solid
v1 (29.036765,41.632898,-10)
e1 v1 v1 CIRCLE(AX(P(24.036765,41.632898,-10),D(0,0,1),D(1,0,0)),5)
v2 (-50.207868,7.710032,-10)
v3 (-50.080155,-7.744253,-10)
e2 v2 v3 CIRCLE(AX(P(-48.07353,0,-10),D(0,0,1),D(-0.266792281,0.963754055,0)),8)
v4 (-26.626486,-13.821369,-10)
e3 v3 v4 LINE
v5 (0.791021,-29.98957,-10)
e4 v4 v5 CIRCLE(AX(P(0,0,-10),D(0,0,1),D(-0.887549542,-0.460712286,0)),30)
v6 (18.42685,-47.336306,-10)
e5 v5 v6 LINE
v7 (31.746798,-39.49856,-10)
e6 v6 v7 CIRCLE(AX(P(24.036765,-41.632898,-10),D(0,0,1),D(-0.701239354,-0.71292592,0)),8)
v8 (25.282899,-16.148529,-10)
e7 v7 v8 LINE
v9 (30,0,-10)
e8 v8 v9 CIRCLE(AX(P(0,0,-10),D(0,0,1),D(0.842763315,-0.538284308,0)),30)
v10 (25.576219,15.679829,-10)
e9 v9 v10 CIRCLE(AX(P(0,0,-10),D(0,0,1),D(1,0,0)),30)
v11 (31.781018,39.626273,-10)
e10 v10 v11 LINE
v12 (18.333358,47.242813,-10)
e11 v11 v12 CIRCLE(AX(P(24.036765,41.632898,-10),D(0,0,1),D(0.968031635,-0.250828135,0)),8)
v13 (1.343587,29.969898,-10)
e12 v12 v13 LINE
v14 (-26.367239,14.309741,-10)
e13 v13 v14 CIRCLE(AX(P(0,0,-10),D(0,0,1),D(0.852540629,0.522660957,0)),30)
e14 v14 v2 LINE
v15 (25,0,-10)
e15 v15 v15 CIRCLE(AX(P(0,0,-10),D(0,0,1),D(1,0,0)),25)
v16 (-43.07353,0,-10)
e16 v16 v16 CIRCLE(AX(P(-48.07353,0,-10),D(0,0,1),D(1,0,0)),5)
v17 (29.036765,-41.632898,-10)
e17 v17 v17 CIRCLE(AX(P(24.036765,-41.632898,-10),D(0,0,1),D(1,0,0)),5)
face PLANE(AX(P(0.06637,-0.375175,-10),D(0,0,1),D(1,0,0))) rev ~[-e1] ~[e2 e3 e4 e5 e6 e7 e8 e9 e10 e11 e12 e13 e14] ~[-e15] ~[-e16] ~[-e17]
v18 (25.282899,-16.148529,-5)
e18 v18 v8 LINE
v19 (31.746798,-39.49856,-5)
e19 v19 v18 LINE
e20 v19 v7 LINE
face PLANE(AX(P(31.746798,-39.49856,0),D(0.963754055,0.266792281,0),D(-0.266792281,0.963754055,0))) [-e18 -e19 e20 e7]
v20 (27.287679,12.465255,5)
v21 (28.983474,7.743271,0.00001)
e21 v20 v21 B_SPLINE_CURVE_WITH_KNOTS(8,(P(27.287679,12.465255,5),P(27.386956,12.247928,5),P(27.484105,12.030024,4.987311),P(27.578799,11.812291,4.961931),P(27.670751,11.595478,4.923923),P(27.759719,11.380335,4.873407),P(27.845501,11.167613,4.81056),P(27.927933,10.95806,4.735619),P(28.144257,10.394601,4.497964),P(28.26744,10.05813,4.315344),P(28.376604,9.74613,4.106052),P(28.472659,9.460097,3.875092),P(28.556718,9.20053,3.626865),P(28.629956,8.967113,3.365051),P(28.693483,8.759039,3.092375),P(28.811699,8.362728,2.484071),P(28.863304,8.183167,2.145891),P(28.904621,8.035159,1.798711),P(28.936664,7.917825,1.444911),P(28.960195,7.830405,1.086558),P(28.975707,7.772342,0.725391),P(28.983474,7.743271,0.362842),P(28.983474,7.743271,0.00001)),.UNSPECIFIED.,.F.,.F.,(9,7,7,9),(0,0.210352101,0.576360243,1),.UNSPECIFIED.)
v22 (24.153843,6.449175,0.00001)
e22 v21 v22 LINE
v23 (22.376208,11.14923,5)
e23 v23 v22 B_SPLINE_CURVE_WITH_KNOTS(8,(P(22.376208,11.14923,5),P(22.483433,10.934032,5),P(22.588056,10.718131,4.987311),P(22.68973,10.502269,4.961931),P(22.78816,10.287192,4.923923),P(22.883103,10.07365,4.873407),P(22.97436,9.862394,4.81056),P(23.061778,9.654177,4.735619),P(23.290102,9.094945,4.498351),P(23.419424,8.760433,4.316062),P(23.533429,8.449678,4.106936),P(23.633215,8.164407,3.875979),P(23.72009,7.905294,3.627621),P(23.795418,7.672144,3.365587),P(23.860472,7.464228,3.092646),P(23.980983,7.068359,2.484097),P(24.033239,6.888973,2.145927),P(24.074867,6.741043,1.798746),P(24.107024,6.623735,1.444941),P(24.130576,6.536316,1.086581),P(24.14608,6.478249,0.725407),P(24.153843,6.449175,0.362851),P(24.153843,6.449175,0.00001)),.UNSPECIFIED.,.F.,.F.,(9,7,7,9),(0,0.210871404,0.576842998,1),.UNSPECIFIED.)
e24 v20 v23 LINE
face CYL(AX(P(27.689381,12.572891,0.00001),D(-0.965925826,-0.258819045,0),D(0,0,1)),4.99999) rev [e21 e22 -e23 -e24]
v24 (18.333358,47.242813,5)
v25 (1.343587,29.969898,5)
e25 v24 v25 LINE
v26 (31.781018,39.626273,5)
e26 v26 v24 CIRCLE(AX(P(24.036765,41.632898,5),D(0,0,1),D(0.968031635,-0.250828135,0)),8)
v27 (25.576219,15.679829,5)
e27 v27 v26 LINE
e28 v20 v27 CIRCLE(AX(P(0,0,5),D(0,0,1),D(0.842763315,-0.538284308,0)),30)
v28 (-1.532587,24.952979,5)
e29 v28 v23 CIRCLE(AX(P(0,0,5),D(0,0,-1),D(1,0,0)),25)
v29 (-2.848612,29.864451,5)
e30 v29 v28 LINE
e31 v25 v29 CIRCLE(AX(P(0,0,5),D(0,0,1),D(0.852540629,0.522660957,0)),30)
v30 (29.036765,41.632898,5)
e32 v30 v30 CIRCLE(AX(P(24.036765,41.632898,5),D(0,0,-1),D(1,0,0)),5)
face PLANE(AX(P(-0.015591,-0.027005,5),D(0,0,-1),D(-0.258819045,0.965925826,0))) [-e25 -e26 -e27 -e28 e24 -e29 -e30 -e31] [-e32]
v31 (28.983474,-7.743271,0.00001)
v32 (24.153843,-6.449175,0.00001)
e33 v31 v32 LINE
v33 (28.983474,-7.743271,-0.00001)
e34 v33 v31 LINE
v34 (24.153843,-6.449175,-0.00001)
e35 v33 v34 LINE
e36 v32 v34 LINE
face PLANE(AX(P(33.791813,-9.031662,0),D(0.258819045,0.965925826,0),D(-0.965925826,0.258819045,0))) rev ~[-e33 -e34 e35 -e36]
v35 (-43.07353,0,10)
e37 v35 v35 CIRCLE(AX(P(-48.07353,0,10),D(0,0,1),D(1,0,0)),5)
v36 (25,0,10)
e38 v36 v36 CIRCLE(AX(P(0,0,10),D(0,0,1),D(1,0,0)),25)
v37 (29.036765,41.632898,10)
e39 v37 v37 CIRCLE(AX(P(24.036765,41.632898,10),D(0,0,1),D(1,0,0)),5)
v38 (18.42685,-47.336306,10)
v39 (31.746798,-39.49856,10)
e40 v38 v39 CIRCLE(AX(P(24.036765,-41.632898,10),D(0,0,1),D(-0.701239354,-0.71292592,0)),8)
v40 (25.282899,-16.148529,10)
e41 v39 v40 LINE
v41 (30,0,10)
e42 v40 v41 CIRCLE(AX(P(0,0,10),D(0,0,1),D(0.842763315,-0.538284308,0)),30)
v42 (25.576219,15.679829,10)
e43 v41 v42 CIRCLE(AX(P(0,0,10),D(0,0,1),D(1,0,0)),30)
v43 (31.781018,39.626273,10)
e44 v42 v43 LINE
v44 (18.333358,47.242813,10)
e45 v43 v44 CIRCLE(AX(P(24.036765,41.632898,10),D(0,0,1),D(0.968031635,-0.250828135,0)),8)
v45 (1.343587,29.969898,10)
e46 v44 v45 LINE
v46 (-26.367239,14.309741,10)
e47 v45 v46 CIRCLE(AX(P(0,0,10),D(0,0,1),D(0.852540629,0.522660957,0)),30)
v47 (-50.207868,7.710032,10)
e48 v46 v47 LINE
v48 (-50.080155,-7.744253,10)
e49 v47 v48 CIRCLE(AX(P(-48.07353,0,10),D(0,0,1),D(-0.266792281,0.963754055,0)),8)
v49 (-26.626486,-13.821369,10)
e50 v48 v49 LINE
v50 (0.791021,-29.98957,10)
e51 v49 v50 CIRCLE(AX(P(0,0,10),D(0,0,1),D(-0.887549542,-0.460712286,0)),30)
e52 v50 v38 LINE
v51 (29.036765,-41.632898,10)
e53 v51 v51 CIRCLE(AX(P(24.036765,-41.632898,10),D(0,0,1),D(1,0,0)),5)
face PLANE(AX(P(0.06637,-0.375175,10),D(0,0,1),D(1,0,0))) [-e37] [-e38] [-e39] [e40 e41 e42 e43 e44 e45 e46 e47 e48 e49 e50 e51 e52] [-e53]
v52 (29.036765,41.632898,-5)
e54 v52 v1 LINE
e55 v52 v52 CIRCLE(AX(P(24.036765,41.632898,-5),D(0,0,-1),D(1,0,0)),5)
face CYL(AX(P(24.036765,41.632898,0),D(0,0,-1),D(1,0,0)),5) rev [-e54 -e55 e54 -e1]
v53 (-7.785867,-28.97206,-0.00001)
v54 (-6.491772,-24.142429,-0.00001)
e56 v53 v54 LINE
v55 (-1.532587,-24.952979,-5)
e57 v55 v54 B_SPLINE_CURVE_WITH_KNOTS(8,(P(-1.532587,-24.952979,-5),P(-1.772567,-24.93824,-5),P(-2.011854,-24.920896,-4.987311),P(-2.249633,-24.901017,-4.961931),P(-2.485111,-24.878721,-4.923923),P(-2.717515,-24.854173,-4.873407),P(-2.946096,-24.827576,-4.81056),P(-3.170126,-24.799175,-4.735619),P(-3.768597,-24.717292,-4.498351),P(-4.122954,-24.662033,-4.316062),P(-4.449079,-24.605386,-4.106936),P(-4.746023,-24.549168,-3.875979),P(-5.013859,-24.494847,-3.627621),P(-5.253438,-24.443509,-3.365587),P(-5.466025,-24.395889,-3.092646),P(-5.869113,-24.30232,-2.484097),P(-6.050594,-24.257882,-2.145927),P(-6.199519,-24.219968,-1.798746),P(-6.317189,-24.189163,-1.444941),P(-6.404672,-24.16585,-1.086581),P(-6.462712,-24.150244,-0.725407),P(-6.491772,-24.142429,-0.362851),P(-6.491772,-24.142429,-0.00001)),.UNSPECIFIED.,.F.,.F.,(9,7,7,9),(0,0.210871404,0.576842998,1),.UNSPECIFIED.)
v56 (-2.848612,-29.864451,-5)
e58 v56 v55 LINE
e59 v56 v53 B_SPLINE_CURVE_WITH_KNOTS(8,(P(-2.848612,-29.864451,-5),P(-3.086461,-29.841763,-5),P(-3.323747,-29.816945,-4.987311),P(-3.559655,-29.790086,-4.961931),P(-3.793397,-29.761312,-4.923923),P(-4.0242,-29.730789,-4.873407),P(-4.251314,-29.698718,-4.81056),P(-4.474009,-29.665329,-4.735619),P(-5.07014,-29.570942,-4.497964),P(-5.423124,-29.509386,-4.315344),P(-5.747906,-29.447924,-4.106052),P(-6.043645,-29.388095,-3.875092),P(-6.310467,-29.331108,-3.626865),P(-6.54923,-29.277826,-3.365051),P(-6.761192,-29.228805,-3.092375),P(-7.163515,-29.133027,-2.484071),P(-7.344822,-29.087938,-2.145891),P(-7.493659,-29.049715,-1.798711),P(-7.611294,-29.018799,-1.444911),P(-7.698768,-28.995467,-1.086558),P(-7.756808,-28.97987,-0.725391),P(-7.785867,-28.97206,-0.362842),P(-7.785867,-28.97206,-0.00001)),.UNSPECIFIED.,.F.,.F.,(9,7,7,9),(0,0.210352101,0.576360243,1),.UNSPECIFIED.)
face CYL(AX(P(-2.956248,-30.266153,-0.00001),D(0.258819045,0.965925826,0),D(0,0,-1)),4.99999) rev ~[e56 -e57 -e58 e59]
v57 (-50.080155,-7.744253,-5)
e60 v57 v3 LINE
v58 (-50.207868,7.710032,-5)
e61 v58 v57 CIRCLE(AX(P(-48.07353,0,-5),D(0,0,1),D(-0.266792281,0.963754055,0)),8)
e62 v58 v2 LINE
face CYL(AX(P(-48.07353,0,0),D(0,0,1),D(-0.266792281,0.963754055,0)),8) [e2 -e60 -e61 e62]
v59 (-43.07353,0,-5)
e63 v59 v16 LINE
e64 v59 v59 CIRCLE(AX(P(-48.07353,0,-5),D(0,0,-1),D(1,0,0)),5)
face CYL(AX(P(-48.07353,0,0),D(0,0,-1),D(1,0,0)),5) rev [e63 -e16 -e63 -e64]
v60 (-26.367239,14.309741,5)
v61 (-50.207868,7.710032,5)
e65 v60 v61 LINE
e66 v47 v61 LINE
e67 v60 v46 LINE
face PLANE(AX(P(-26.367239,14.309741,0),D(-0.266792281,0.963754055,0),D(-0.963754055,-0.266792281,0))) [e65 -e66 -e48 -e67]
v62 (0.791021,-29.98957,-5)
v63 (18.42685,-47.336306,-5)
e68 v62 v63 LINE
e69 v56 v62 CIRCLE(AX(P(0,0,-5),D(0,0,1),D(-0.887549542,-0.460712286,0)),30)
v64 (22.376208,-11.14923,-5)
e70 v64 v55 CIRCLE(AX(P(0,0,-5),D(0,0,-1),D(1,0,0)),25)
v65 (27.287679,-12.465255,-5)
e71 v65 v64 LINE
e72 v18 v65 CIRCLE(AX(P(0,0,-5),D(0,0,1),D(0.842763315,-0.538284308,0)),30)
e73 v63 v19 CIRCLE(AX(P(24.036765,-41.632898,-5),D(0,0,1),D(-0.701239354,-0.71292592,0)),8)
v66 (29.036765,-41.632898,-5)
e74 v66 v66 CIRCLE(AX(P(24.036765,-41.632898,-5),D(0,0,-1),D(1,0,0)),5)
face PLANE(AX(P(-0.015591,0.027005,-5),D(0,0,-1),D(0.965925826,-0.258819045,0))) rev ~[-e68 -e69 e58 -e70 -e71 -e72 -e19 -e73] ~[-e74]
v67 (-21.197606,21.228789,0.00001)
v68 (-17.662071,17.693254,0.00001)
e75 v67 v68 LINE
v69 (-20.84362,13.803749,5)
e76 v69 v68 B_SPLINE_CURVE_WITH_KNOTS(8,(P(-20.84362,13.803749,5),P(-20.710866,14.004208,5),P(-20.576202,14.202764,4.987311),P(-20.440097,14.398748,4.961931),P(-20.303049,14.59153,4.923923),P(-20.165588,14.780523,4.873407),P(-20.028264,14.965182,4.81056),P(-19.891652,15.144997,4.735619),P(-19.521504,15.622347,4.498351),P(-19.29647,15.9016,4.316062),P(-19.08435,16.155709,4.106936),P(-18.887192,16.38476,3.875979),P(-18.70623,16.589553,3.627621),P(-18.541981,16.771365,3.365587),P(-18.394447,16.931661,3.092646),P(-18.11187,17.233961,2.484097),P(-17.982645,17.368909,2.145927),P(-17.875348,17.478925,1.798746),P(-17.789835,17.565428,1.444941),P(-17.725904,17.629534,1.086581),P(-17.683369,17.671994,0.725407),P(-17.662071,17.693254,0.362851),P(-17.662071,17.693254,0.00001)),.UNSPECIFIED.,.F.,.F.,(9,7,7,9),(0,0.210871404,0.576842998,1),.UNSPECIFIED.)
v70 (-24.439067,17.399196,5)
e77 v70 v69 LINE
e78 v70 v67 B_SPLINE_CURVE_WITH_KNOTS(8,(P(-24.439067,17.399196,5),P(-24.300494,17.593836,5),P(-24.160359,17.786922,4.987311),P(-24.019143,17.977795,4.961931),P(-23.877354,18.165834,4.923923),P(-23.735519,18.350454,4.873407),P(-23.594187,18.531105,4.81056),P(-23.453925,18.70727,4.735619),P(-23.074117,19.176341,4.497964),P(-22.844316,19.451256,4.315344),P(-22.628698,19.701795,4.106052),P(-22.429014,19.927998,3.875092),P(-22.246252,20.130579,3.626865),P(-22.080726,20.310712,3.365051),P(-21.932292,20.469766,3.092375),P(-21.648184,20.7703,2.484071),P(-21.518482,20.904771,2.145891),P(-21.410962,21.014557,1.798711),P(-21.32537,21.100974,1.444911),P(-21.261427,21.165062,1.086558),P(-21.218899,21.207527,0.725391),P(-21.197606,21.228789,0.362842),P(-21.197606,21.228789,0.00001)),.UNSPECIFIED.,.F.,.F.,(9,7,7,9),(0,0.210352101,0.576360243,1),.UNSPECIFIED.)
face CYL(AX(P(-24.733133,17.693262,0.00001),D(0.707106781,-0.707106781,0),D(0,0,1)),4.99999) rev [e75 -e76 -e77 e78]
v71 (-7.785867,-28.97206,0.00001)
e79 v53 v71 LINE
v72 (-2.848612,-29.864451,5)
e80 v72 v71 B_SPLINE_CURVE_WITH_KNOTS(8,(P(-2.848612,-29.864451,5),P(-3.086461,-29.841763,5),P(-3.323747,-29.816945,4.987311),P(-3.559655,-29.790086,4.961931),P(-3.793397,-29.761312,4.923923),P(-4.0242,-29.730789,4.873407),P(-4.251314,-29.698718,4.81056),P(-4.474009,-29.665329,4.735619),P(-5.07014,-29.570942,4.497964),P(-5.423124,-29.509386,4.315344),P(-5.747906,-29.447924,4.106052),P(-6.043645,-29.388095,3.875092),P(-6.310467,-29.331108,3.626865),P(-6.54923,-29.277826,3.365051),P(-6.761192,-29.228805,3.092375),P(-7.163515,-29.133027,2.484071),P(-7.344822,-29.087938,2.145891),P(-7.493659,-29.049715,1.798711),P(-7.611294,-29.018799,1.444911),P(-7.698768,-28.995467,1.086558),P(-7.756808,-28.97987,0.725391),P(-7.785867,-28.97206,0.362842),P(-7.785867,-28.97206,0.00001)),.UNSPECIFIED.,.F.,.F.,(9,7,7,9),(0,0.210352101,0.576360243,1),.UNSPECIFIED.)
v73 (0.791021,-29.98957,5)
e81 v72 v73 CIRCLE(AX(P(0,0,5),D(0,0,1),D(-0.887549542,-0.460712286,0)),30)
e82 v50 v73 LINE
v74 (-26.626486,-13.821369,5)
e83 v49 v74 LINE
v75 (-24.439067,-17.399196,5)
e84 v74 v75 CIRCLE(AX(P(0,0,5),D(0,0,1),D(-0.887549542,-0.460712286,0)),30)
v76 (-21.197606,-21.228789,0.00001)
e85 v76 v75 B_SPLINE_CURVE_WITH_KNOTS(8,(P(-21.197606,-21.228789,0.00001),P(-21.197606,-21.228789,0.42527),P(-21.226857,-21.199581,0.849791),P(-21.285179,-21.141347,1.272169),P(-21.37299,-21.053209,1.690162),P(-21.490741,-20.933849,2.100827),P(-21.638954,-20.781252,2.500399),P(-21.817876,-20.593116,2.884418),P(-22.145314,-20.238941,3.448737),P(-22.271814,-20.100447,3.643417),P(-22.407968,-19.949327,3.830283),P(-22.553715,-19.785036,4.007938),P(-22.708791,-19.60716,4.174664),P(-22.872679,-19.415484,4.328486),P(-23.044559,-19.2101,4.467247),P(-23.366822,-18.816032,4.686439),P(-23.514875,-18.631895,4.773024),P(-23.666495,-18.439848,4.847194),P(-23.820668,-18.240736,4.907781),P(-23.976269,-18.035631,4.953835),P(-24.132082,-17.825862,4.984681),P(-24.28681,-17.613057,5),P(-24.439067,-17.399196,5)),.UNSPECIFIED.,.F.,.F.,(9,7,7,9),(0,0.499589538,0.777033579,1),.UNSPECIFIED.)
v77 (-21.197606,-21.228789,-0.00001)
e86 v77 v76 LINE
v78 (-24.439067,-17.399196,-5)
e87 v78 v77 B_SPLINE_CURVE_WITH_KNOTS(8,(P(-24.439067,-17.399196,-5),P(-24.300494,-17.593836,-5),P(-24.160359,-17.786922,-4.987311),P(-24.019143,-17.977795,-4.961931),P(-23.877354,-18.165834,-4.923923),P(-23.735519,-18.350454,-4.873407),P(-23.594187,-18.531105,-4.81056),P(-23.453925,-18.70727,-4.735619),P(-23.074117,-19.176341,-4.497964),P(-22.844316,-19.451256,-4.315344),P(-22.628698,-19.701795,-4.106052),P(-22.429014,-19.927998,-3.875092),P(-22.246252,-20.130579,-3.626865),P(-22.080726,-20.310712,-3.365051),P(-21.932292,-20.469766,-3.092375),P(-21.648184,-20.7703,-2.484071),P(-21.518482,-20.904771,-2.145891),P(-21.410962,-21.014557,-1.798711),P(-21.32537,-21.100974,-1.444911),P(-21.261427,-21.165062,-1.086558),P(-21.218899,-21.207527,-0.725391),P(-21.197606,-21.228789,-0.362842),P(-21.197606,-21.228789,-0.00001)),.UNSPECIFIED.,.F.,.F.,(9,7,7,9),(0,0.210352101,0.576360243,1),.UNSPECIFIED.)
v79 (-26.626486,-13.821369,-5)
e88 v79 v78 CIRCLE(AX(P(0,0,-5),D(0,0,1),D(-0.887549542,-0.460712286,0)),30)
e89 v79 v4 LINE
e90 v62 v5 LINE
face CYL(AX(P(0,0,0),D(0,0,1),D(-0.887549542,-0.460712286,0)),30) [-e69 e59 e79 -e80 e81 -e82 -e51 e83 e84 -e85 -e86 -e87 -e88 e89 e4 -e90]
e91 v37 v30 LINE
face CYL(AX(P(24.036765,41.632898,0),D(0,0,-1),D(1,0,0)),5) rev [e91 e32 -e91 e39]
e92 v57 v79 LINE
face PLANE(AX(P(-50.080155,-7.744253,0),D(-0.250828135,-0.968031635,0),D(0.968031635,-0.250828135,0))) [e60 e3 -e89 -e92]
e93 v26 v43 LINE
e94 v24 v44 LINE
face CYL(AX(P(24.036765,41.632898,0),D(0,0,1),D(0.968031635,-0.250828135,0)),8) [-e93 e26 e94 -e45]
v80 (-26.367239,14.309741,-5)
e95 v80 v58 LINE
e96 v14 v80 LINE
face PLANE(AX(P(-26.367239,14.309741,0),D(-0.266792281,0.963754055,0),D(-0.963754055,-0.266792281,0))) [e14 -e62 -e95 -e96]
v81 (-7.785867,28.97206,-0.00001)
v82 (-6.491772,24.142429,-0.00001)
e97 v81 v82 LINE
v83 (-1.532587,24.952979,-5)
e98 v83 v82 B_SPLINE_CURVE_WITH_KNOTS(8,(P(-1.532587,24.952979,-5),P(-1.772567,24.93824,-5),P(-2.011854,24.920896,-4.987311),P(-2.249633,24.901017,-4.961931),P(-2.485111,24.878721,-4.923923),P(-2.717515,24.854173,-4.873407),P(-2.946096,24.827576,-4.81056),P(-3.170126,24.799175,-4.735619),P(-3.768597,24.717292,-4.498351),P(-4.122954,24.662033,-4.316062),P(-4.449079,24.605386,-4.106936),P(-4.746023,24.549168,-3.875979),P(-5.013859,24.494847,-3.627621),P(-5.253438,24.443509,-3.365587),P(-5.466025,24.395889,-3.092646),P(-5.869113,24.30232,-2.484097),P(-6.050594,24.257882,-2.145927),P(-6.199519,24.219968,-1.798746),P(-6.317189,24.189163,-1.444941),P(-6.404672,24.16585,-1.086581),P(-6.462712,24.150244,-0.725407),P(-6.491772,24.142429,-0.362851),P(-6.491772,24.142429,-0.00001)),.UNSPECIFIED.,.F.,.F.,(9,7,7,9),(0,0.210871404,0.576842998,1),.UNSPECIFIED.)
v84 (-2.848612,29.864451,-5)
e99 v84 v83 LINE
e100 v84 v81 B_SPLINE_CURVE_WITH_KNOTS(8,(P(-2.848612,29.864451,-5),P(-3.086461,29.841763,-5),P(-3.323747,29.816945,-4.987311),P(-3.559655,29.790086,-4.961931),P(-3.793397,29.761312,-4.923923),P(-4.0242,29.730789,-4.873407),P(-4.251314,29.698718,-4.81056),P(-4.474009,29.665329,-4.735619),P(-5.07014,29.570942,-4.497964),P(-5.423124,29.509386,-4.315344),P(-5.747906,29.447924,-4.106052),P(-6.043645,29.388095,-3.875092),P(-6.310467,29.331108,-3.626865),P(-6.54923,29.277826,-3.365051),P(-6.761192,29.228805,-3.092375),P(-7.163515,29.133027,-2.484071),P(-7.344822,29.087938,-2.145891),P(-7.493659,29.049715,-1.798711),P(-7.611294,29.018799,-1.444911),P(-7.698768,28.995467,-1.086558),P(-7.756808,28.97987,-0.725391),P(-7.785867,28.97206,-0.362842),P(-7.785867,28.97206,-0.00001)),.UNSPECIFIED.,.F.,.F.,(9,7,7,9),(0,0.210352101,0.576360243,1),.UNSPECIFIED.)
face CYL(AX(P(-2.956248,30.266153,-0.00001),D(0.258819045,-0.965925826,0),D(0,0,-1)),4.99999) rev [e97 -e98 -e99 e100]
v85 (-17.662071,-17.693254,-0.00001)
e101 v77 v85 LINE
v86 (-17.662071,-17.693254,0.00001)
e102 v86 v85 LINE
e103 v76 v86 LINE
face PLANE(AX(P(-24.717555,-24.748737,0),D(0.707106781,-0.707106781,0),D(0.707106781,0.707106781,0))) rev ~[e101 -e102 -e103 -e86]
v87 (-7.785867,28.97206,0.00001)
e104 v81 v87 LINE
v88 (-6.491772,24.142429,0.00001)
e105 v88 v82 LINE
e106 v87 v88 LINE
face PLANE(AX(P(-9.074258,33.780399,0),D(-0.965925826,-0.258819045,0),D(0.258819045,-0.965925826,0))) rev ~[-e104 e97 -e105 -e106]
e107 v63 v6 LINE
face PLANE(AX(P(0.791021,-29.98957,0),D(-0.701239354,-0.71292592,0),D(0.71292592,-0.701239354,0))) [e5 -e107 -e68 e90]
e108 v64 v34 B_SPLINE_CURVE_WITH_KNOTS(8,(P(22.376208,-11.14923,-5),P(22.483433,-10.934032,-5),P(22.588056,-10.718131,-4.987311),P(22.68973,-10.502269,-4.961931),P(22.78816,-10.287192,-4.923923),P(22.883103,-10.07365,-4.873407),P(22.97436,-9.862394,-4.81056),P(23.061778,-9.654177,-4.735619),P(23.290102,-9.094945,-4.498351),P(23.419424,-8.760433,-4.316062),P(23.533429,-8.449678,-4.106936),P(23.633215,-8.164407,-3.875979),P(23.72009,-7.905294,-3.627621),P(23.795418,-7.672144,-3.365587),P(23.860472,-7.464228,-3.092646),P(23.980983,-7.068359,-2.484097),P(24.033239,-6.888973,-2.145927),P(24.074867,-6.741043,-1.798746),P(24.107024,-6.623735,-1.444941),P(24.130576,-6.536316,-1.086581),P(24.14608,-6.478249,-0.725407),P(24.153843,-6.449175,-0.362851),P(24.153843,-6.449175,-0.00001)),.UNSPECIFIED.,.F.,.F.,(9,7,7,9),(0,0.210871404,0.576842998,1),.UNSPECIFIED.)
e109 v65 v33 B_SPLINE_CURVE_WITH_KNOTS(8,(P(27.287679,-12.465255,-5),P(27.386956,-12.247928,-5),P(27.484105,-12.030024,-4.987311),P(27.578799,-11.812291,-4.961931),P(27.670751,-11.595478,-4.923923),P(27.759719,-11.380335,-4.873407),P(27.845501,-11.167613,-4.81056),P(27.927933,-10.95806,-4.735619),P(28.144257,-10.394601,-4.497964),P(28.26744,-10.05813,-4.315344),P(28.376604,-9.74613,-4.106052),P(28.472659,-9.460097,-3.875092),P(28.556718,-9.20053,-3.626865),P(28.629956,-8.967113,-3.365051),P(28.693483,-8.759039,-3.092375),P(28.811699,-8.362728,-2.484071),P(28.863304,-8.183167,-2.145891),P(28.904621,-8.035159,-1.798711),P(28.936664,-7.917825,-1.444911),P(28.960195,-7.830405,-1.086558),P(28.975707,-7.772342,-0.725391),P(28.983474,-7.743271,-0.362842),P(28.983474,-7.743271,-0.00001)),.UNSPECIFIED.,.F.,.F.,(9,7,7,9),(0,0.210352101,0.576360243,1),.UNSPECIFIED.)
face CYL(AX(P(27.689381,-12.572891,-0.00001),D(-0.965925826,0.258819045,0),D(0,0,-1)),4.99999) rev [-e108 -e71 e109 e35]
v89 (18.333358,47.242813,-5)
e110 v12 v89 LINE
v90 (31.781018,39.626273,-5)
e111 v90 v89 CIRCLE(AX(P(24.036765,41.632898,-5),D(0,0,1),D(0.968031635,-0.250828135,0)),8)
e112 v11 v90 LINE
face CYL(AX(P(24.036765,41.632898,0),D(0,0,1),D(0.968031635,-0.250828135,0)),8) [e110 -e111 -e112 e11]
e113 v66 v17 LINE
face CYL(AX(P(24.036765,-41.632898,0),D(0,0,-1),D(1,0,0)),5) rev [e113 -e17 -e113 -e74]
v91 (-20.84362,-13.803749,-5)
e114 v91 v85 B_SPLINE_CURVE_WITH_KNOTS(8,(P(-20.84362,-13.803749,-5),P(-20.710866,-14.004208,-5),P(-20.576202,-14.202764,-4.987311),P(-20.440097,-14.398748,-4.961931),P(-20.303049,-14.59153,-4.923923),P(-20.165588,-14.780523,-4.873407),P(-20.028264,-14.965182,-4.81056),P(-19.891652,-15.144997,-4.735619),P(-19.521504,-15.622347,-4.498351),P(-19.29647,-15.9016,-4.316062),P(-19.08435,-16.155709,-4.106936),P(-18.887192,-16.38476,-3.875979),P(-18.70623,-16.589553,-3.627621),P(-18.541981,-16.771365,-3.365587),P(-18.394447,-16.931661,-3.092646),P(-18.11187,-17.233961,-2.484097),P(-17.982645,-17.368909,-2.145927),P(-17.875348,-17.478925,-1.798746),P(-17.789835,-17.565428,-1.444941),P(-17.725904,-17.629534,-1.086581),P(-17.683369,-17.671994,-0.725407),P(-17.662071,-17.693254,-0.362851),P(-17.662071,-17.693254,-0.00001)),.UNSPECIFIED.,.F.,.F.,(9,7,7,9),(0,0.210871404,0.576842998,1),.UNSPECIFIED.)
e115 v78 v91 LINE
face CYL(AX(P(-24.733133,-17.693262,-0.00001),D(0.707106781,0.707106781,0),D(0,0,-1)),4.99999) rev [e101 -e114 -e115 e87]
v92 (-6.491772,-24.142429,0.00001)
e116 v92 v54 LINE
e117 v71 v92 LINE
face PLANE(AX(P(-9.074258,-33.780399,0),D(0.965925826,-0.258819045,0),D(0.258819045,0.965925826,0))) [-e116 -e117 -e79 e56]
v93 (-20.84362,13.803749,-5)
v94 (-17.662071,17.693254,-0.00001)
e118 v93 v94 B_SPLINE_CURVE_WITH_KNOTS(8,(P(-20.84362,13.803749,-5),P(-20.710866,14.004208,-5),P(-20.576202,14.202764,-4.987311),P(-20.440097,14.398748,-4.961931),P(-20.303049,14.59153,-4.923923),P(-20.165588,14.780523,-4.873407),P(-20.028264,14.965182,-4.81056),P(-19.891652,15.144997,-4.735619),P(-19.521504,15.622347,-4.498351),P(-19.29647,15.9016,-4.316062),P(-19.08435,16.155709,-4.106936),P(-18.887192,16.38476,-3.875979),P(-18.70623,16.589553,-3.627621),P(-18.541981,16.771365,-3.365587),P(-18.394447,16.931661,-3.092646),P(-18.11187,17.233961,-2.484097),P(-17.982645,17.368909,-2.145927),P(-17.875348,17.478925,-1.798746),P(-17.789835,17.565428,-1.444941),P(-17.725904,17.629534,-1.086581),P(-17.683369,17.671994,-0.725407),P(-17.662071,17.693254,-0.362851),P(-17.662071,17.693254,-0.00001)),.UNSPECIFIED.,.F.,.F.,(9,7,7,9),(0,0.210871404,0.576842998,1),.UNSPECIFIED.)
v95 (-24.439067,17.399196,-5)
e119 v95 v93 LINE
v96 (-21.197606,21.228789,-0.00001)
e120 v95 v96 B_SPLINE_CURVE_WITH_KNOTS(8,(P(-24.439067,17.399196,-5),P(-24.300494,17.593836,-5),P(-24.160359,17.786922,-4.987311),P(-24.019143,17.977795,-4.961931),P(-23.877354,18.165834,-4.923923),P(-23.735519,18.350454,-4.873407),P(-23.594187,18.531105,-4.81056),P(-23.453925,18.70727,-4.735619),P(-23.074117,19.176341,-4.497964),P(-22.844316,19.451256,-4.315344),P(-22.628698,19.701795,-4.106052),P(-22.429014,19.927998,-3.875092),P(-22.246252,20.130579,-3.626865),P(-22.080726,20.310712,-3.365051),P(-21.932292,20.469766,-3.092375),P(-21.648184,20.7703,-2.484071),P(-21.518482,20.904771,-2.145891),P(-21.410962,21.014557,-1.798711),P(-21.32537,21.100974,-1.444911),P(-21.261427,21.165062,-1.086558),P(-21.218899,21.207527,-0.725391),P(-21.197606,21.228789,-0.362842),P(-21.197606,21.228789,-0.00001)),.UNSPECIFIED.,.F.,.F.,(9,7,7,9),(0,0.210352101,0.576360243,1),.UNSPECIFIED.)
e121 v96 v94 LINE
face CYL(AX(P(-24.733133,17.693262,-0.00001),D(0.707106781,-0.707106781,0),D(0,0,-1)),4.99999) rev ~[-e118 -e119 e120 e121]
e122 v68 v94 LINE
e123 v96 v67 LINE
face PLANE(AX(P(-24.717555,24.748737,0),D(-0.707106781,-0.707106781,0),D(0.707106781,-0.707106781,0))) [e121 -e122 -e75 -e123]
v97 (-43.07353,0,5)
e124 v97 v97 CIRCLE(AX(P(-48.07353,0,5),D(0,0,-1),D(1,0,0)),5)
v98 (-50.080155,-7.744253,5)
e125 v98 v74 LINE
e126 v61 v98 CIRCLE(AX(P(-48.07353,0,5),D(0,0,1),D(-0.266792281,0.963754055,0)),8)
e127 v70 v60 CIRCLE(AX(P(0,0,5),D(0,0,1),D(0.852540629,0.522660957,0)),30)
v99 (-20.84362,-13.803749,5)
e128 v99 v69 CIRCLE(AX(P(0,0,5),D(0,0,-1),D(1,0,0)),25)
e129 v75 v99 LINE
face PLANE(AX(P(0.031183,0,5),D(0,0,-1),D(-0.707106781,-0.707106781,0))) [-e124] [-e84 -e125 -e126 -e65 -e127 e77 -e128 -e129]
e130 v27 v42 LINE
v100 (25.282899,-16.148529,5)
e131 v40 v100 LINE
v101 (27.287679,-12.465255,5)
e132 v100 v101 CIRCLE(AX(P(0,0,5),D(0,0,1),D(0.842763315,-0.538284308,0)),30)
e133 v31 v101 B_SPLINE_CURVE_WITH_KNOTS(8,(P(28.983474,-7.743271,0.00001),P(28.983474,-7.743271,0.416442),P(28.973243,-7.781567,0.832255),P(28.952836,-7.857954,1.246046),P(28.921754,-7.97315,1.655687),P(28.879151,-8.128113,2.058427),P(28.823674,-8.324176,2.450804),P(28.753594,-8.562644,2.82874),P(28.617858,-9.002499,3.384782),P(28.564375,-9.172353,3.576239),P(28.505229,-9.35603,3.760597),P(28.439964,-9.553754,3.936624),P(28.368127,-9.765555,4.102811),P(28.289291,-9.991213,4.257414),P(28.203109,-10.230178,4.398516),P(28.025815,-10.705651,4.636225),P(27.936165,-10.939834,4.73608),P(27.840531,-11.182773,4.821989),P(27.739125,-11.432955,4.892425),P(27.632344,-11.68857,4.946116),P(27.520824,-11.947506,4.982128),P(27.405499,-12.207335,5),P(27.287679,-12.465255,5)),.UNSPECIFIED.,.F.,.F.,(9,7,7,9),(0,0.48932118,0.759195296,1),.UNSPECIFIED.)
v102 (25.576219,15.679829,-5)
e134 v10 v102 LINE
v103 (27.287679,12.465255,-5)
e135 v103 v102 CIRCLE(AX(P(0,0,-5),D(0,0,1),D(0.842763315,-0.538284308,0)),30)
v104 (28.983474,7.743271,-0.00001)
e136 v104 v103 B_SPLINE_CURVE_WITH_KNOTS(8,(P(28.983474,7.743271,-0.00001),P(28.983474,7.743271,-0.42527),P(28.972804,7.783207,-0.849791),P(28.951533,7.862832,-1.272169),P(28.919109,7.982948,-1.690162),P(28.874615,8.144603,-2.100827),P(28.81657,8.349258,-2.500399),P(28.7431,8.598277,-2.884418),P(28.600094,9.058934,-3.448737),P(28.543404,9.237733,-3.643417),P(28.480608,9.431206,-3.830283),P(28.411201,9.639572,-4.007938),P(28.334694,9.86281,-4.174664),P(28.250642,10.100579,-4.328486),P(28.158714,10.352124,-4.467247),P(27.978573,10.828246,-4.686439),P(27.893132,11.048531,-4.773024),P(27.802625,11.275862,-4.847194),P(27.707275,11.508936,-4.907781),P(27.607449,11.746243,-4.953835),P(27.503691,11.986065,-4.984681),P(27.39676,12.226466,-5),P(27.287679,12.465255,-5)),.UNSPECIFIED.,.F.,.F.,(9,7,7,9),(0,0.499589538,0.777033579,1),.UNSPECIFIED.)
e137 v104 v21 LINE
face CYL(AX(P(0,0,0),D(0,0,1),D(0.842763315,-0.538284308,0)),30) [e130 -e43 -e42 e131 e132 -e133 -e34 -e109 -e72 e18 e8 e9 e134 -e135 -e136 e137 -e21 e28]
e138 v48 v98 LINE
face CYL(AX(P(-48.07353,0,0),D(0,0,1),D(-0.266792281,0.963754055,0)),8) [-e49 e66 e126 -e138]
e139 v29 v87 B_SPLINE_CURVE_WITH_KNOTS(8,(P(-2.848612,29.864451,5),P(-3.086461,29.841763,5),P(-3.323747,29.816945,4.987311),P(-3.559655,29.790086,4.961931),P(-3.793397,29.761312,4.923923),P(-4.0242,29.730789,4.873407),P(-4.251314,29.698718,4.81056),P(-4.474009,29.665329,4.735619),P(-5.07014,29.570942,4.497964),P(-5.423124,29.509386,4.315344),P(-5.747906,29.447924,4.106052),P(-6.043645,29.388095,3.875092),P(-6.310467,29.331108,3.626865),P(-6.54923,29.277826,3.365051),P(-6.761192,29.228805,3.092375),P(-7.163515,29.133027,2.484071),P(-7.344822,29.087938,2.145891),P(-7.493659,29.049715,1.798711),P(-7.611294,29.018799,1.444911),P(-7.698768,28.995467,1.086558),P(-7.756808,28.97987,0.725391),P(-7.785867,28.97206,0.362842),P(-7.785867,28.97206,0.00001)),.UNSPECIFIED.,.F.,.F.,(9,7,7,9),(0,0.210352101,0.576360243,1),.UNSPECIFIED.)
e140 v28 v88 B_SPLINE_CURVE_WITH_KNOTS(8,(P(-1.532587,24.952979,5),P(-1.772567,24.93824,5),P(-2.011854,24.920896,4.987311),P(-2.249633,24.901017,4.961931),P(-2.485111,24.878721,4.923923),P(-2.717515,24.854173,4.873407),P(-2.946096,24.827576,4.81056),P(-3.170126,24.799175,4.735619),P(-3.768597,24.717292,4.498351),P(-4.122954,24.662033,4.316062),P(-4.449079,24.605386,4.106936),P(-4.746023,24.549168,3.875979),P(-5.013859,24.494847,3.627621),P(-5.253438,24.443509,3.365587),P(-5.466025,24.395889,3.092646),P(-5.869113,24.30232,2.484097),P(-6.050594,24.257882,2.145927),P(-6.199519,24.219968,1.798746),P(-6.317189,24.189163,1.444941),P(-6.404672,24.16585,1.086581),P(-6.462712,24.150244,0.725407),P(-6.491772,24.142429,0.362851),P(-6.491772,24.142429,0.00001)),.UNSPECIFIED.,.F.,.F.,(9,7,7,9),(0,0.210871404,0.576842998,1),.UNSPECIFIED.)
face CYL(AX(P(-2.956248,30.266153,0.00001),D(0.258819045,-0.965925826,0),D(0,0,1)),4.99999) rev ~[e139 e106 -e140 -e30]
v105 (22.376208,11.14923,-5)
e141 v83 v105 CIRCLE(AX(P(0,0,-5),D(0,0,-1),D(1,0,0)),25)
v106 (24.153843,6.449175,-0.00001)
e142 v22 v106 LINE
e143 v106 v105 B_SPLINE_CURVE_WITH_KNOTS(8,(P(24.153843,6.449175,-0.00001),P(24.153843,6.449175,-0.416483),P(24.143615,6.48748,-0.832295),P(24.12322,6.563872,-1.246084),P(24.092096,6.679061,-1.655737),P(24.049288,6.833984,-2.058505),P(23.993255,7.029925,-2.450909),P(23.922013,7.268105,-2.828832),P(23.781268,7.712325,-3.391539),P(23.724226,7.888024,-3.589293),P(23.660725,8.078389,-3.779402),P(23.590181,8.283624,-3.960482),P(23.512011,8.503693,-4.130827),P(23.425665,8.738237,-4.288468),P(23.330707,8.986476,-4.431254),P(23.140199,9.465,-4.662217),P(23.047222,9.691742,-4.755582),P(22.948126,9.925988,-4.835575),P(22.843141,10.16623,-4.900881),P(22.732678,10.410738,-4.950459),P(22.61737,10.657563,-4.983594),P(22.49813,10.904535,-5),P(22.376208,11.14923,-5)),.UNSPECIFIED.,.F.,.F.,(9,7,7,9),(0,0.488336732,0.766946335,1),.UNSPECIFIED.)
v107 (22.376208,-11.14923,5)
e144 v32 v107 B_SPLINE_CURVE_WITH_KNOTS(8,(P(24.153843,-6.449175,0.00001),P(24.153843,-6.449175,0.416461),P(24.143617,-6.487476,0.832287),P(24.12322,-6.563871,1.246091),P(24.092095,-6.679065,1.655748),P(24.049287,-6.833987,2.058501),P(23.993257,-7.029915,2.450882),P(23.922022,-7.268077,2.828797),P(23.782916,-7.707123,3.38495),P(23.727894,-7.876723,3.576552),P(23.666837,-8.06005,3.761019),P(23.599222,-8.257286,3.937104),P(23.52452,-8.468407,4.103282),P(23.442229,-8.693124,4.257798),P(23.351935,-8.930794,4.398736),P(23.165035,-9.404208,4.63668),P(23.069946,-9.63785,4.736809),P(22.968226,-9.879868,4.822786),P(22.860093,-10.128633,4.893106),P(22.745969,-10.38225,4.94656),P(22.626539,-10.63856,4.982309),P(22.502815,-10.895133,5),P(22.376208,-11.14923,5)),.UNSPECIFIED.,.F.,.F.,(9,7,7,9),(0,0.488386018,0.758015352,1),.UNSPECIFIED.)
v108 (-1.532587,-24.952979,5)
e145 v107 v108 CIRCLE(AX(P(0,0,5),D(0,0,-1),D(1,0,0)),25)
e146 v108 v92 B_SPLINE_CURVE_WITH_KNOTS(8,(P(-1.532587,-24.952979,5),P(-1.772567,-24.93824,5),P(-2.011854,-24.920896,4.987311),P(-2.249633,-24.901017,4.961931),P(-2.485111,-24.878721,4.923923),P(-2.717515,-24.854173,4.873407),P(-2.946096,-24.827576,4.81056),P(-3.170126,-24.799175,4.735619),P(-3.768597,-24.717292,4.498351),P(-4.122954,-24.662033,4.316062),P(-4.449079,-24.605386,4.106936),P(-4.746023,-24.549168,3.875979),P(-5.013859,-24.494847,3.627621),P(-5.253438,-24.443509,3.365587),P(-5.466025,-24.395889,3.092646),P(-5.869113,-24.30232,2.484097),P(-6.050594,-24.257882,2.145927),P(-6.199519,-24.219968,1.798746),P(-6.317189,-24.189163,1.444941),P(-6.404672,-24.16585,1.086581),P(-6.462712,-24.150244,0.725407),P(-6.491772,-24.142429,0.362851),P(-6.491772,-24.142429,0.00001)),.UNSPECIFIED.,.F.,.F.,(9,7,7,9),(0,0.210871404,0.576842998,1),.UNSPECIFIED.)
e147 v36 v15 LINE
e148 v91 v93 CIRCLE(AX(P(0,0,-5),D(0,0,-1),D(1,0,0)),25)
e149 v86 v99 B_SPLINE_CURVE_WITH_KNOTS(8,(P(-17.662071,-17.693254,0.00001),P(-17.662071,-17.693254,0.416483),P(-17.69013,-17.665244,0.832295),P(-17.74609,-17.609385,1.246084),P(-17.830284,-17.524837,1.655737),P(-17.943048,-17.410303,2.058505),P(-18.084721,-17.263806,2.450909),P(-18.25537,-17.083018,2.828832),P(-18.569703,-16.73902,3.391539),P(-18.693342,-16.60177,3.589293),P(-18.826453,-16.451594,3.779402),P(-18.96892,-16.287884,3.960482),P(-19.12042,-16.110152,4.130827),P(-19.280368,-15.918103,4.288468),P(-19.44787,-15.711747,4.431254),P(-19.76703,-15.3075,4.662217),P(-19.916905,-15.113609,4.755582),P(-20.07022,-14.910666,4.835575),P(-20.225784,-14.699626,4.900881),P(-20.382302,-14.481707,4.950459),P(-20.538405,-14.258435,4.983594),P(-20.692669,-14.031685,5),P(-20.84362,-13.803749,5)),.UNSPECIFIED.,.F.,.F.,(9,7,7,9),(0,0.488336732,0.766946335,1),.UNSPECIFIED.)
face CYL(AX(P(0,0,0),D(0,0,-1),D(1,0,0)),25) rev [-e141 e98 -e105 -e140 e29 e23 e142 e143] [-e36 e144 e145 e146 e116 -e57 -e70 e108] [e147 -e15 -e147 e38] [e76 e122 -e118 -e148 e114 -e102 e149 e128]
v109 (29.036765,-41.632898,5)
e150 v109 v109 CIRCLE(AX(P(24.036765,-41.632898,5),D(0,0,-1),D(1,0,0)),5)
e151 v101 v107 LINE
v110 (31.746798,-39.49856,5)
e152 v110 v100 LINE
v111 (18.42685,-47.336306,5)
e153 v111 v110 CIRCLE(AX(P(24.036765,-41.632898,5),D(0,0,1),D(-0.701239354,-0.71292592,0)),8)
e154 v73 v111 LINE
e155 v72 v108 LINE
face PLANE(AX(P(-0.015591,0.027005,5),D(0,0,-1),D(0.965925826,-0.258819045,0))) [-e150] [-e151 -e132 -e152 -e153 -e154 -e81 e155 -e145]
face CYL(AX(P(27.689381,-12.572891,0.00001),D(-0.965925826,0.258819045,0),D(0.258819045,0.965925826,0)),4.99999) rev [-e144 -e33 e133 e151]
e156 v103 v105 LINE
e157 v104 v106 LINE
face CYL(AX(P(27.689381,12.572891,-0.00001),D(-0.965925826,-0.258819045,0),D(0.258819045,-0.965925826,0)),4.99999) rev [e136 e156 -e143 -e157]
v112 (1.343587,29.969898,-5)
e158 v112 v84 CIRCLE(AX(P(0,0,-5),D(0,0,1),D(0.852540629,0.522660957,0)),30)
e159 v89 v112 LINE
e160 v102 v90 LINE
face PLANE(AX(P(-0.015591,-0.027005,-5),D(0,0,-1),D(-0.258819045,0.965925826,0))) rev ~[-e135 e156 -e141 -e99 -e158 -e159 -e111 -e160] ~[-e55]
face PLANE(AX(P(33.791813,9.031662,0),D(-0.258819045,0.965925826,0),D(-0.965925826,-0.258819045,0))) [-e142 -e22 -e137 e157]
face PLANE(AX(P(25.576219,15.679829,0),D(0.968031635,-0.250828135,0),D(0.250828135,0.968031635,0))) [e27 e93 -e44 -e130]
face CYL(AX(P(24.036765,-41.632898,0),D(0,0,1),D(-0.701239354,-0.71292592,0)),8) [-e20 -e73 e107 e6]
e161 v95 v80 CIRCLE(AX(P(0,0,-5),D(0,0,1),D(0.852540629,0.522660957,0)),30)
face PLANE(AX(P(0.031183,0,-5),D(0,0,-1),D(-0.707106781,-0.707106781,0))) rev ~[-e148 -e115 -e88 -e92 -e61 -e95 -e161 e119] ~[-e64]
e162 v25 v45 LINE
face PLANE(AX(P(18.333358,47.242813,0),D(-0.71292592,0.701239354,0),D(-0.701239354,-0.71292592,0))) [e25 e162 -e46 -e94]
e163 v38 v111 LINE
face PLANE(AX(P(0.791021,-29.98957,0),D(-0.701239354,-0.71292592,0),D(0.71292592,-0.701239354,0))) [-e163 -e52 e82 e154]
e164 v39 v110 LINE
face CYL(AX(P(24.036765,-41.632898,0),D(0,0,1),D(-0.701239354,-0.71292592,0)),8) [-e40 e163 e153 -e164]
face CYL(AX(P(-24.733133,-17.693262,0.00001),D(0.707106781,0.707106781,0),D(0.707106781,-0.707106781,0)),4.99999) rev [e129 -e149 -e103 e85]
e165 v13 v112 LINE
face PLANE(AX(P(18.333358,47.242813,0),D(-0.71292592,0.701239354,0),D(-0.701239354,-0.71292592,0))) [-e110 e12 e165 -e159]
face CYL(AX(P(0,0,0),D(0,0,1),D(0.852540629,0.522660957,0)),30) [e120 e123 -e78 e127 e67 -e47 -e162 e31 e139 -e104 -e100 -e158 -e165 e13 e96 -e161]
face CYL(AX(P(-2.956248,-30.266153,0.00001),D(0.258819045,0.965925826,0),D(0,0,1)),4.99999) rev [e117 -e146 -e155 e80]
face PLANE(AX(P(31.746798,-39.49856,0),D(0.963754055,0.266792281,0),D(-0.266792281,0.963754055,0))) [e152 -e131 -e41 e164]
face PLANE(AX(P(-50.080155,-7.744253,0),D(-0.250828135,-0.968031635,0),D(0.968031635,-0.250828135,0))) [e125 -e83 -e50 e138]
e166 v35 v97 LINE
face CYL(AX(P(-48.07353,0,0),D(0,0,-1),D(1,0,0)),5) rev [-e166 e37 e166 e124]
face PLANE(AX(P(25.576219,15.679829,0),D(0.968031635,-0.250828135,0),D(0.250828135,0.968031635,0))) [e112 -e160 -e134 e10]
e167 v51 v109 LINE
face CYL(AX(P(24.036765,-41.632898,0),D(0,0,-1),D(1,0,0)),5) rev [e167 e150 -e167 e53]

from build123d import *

# Parameters (mm, degrees)
F0_R          = 25
F0_R_2        = 5
F1_DEPTH      = 10
F1_DEPTH_BACK = 10
F2_W          = 70
F2_H          = 10
F3_ANGLE_BACK = 45
F3_ANGLE      = 90
F4_COUNT      = 3
F4_ANGLE      = 240
F6_R          = 4.99999


# Not quite as in the source:
# - a fillet or chamfer is up to 0.001 mm smaller than in the source, because OpenCascade refuses the exact size


with BuildPart() as f1:
    # F0 (on Top) → F1 (new body, two sides)
    with BuildSketch(Plane.XY) as f1_sk:
        with BuildLine():
            ThreePointArc((25.282899435, -16.1485292259), (28.7965881924, -8.4116888004), (30, 0))
            ThreePointArc((30, 0), (28.8728814443, 8.1459632398), (25.5762188598, 15.6798287247))
            ThreePointArc((25.5762188598, 15.6798287247), (15.2387828621, 25.8414298537), (1.3435868258, 29.969897805))
            ThreePointArc((1.3435868258, 29.969897805), (-14.7599432924, 26.1178880081), (-26.3672394325, 14.3097409029))
            ThreePointArc((-26.3672394325, 14.3097409029), (-29.9987261544, 0.2764581545), (-26.6264862609, -13.8213685791))
            ThreePointArc((-26.6264862609, -13.8213685791), (-15.2387828621, -25.8414298537), (0.7910205727, -29.9895696277))
            ThreePointArc((0.7910205727, -29.9895696277), (14.7599432924, -26.1178880081), (25.282899435, -16.1485292259))
        make_face()
        Circle(F0_R, mode=Mode.SUBTRACT)
        with BuildLine():
            ThreePointArc((1.3435868258, 29.969897805), (15.2387828621, 25.8414298537), (25.5762188598, 15.6798287247))
            Line((25.5762188598, 15.6798287247), (31.7810181804, 39.6262733222))
            ThreePointArc((31.7810181804, 39.6262733222), (27.9793762729, 48.5939196708), (18.3333577354, 47.2428132348))
            Line((18.3333577354, 47.2428132348), (1.3435868258, 29.969897805))
        make_face()
        with Locations((24.0367650986, 41.6328984003)):
            Circle(F0_R_2, mode=Mode.SUBTRACT)
        with BuildLine():
            Line((31.7467975399, -39.4985601529), (25.282899435, -16.1485292259))
            ThreePointArc((25.282899435, -16.1485292259), (14.7599432924, -26.1178880081), (0.7910205727, -29.9895696277))
            Line((0.7910205727, -29.9895696277), (18.4268502641, -47.3363057635))
            ThreePointArc((18.4268502641, -47.3363057635), (28.0938807679, -48.5278104698), (31.7467975399, -39.4985601529))
        make_face()
        with Locations((24.0367650986, -41.6328984003)):
            Circle(F0_R_2, mode=Mode.SUBTRACT)
        with BuildLine():
            ThreePointArc((-26.6264862609, -13.8213685791), (-29.9987261544, 0.2764581545), (-26.3672394325, 14.3097409029))
            Line((-26.3672394325, 14.3097409029), (-50.2078684445, 7.7100324413))
            ThreePointArc((-50.2078684445, 7.7100324413), (-56.0732570408, -0.066109201), (-50.0801552753, -7.7442530819))
            Line((-50.0801552753, -7.7442530819), (-26.6264862609, -13.8213685791))
        make_face()
        with Locations((-48.0735301971, 0)):
            Circle(F0_R_2, mode=Mode.SUBTRACT)
    extrude(amount=F1_DEPTH)
    extrude(f1_sk.sketch, amount=-F1_DEPTH_BACK)


with BuildPart() as f3:
    # F2 (on Front) → F3 (revolve)
    with BuildSketch(Plane.XZ, mode=Mode.PRIVATE) as f3_sk:
        with Locations((-34.9688172646, 0)):
            Rectangle(F2_W, F2_H)
    revolve(f3_sk.sketch.rotate(Axis((0.0311827354, 0, 0), (0, 0, -1)), -F3_ANGLE_BACK), axis=Axis((0.0311827354, 0, 0), (0, 0, -1)), revolution_arc=F3_ANGLE)


with BuildPart() as f4_1:
    # F4: instance of F3
    add(f3.part.rotate(Axis((0, 0, 10), (0, 0, -1)), 1 * F4_ANGLE / (F4_COUNT - 1)))


with BuildPart() as f4_2:
    # F4: instance of F3
    add(f3.part.rotate(Axis((0, 0, 10), (0, 0, -1)), 2 * F4_ANGLE / (F4_COUNT - 1)))


with BuildPart() as f1_1:
    add(f1.part)

    # F5: cut F3, F4_1, F4_2
    add(f3.part, mode=Mode.SUBTRACT)
    add(f4_1.part, mode=Mode.SUBTRACT)
    add(f4_2.part, mode=Mode.SUBTRACT)

    # F6 (radius 5 in the source; OpenCascade refuses exactly that, so slightly less here)
    f6_edges = [f1_1.edges().sort_by_distance(p)[0] for p in [
        (26.568658, 7.096223, 5),
        (26.568658, 7.096223, -5),
        (26.568658, -7.096223, -5),
        (26.568658, -7.096223, 5),
        (-7.13882, -26.557245, 5),
        (-7.13882, -26.557245, -5),
        (-19.429839, 19.461022, -5),
        (-7.13882, 26.557245, -5),
        (-19.429839, 19.461022, 5),
        (-7.13882, 26.557245, 5),
        (-19.429839, -19.461022, -5),
        (-19.429839, -19.461022, 5),
    ]]
    fillet(f6_edges, radius=F6_R)


solid = f1_1.part
